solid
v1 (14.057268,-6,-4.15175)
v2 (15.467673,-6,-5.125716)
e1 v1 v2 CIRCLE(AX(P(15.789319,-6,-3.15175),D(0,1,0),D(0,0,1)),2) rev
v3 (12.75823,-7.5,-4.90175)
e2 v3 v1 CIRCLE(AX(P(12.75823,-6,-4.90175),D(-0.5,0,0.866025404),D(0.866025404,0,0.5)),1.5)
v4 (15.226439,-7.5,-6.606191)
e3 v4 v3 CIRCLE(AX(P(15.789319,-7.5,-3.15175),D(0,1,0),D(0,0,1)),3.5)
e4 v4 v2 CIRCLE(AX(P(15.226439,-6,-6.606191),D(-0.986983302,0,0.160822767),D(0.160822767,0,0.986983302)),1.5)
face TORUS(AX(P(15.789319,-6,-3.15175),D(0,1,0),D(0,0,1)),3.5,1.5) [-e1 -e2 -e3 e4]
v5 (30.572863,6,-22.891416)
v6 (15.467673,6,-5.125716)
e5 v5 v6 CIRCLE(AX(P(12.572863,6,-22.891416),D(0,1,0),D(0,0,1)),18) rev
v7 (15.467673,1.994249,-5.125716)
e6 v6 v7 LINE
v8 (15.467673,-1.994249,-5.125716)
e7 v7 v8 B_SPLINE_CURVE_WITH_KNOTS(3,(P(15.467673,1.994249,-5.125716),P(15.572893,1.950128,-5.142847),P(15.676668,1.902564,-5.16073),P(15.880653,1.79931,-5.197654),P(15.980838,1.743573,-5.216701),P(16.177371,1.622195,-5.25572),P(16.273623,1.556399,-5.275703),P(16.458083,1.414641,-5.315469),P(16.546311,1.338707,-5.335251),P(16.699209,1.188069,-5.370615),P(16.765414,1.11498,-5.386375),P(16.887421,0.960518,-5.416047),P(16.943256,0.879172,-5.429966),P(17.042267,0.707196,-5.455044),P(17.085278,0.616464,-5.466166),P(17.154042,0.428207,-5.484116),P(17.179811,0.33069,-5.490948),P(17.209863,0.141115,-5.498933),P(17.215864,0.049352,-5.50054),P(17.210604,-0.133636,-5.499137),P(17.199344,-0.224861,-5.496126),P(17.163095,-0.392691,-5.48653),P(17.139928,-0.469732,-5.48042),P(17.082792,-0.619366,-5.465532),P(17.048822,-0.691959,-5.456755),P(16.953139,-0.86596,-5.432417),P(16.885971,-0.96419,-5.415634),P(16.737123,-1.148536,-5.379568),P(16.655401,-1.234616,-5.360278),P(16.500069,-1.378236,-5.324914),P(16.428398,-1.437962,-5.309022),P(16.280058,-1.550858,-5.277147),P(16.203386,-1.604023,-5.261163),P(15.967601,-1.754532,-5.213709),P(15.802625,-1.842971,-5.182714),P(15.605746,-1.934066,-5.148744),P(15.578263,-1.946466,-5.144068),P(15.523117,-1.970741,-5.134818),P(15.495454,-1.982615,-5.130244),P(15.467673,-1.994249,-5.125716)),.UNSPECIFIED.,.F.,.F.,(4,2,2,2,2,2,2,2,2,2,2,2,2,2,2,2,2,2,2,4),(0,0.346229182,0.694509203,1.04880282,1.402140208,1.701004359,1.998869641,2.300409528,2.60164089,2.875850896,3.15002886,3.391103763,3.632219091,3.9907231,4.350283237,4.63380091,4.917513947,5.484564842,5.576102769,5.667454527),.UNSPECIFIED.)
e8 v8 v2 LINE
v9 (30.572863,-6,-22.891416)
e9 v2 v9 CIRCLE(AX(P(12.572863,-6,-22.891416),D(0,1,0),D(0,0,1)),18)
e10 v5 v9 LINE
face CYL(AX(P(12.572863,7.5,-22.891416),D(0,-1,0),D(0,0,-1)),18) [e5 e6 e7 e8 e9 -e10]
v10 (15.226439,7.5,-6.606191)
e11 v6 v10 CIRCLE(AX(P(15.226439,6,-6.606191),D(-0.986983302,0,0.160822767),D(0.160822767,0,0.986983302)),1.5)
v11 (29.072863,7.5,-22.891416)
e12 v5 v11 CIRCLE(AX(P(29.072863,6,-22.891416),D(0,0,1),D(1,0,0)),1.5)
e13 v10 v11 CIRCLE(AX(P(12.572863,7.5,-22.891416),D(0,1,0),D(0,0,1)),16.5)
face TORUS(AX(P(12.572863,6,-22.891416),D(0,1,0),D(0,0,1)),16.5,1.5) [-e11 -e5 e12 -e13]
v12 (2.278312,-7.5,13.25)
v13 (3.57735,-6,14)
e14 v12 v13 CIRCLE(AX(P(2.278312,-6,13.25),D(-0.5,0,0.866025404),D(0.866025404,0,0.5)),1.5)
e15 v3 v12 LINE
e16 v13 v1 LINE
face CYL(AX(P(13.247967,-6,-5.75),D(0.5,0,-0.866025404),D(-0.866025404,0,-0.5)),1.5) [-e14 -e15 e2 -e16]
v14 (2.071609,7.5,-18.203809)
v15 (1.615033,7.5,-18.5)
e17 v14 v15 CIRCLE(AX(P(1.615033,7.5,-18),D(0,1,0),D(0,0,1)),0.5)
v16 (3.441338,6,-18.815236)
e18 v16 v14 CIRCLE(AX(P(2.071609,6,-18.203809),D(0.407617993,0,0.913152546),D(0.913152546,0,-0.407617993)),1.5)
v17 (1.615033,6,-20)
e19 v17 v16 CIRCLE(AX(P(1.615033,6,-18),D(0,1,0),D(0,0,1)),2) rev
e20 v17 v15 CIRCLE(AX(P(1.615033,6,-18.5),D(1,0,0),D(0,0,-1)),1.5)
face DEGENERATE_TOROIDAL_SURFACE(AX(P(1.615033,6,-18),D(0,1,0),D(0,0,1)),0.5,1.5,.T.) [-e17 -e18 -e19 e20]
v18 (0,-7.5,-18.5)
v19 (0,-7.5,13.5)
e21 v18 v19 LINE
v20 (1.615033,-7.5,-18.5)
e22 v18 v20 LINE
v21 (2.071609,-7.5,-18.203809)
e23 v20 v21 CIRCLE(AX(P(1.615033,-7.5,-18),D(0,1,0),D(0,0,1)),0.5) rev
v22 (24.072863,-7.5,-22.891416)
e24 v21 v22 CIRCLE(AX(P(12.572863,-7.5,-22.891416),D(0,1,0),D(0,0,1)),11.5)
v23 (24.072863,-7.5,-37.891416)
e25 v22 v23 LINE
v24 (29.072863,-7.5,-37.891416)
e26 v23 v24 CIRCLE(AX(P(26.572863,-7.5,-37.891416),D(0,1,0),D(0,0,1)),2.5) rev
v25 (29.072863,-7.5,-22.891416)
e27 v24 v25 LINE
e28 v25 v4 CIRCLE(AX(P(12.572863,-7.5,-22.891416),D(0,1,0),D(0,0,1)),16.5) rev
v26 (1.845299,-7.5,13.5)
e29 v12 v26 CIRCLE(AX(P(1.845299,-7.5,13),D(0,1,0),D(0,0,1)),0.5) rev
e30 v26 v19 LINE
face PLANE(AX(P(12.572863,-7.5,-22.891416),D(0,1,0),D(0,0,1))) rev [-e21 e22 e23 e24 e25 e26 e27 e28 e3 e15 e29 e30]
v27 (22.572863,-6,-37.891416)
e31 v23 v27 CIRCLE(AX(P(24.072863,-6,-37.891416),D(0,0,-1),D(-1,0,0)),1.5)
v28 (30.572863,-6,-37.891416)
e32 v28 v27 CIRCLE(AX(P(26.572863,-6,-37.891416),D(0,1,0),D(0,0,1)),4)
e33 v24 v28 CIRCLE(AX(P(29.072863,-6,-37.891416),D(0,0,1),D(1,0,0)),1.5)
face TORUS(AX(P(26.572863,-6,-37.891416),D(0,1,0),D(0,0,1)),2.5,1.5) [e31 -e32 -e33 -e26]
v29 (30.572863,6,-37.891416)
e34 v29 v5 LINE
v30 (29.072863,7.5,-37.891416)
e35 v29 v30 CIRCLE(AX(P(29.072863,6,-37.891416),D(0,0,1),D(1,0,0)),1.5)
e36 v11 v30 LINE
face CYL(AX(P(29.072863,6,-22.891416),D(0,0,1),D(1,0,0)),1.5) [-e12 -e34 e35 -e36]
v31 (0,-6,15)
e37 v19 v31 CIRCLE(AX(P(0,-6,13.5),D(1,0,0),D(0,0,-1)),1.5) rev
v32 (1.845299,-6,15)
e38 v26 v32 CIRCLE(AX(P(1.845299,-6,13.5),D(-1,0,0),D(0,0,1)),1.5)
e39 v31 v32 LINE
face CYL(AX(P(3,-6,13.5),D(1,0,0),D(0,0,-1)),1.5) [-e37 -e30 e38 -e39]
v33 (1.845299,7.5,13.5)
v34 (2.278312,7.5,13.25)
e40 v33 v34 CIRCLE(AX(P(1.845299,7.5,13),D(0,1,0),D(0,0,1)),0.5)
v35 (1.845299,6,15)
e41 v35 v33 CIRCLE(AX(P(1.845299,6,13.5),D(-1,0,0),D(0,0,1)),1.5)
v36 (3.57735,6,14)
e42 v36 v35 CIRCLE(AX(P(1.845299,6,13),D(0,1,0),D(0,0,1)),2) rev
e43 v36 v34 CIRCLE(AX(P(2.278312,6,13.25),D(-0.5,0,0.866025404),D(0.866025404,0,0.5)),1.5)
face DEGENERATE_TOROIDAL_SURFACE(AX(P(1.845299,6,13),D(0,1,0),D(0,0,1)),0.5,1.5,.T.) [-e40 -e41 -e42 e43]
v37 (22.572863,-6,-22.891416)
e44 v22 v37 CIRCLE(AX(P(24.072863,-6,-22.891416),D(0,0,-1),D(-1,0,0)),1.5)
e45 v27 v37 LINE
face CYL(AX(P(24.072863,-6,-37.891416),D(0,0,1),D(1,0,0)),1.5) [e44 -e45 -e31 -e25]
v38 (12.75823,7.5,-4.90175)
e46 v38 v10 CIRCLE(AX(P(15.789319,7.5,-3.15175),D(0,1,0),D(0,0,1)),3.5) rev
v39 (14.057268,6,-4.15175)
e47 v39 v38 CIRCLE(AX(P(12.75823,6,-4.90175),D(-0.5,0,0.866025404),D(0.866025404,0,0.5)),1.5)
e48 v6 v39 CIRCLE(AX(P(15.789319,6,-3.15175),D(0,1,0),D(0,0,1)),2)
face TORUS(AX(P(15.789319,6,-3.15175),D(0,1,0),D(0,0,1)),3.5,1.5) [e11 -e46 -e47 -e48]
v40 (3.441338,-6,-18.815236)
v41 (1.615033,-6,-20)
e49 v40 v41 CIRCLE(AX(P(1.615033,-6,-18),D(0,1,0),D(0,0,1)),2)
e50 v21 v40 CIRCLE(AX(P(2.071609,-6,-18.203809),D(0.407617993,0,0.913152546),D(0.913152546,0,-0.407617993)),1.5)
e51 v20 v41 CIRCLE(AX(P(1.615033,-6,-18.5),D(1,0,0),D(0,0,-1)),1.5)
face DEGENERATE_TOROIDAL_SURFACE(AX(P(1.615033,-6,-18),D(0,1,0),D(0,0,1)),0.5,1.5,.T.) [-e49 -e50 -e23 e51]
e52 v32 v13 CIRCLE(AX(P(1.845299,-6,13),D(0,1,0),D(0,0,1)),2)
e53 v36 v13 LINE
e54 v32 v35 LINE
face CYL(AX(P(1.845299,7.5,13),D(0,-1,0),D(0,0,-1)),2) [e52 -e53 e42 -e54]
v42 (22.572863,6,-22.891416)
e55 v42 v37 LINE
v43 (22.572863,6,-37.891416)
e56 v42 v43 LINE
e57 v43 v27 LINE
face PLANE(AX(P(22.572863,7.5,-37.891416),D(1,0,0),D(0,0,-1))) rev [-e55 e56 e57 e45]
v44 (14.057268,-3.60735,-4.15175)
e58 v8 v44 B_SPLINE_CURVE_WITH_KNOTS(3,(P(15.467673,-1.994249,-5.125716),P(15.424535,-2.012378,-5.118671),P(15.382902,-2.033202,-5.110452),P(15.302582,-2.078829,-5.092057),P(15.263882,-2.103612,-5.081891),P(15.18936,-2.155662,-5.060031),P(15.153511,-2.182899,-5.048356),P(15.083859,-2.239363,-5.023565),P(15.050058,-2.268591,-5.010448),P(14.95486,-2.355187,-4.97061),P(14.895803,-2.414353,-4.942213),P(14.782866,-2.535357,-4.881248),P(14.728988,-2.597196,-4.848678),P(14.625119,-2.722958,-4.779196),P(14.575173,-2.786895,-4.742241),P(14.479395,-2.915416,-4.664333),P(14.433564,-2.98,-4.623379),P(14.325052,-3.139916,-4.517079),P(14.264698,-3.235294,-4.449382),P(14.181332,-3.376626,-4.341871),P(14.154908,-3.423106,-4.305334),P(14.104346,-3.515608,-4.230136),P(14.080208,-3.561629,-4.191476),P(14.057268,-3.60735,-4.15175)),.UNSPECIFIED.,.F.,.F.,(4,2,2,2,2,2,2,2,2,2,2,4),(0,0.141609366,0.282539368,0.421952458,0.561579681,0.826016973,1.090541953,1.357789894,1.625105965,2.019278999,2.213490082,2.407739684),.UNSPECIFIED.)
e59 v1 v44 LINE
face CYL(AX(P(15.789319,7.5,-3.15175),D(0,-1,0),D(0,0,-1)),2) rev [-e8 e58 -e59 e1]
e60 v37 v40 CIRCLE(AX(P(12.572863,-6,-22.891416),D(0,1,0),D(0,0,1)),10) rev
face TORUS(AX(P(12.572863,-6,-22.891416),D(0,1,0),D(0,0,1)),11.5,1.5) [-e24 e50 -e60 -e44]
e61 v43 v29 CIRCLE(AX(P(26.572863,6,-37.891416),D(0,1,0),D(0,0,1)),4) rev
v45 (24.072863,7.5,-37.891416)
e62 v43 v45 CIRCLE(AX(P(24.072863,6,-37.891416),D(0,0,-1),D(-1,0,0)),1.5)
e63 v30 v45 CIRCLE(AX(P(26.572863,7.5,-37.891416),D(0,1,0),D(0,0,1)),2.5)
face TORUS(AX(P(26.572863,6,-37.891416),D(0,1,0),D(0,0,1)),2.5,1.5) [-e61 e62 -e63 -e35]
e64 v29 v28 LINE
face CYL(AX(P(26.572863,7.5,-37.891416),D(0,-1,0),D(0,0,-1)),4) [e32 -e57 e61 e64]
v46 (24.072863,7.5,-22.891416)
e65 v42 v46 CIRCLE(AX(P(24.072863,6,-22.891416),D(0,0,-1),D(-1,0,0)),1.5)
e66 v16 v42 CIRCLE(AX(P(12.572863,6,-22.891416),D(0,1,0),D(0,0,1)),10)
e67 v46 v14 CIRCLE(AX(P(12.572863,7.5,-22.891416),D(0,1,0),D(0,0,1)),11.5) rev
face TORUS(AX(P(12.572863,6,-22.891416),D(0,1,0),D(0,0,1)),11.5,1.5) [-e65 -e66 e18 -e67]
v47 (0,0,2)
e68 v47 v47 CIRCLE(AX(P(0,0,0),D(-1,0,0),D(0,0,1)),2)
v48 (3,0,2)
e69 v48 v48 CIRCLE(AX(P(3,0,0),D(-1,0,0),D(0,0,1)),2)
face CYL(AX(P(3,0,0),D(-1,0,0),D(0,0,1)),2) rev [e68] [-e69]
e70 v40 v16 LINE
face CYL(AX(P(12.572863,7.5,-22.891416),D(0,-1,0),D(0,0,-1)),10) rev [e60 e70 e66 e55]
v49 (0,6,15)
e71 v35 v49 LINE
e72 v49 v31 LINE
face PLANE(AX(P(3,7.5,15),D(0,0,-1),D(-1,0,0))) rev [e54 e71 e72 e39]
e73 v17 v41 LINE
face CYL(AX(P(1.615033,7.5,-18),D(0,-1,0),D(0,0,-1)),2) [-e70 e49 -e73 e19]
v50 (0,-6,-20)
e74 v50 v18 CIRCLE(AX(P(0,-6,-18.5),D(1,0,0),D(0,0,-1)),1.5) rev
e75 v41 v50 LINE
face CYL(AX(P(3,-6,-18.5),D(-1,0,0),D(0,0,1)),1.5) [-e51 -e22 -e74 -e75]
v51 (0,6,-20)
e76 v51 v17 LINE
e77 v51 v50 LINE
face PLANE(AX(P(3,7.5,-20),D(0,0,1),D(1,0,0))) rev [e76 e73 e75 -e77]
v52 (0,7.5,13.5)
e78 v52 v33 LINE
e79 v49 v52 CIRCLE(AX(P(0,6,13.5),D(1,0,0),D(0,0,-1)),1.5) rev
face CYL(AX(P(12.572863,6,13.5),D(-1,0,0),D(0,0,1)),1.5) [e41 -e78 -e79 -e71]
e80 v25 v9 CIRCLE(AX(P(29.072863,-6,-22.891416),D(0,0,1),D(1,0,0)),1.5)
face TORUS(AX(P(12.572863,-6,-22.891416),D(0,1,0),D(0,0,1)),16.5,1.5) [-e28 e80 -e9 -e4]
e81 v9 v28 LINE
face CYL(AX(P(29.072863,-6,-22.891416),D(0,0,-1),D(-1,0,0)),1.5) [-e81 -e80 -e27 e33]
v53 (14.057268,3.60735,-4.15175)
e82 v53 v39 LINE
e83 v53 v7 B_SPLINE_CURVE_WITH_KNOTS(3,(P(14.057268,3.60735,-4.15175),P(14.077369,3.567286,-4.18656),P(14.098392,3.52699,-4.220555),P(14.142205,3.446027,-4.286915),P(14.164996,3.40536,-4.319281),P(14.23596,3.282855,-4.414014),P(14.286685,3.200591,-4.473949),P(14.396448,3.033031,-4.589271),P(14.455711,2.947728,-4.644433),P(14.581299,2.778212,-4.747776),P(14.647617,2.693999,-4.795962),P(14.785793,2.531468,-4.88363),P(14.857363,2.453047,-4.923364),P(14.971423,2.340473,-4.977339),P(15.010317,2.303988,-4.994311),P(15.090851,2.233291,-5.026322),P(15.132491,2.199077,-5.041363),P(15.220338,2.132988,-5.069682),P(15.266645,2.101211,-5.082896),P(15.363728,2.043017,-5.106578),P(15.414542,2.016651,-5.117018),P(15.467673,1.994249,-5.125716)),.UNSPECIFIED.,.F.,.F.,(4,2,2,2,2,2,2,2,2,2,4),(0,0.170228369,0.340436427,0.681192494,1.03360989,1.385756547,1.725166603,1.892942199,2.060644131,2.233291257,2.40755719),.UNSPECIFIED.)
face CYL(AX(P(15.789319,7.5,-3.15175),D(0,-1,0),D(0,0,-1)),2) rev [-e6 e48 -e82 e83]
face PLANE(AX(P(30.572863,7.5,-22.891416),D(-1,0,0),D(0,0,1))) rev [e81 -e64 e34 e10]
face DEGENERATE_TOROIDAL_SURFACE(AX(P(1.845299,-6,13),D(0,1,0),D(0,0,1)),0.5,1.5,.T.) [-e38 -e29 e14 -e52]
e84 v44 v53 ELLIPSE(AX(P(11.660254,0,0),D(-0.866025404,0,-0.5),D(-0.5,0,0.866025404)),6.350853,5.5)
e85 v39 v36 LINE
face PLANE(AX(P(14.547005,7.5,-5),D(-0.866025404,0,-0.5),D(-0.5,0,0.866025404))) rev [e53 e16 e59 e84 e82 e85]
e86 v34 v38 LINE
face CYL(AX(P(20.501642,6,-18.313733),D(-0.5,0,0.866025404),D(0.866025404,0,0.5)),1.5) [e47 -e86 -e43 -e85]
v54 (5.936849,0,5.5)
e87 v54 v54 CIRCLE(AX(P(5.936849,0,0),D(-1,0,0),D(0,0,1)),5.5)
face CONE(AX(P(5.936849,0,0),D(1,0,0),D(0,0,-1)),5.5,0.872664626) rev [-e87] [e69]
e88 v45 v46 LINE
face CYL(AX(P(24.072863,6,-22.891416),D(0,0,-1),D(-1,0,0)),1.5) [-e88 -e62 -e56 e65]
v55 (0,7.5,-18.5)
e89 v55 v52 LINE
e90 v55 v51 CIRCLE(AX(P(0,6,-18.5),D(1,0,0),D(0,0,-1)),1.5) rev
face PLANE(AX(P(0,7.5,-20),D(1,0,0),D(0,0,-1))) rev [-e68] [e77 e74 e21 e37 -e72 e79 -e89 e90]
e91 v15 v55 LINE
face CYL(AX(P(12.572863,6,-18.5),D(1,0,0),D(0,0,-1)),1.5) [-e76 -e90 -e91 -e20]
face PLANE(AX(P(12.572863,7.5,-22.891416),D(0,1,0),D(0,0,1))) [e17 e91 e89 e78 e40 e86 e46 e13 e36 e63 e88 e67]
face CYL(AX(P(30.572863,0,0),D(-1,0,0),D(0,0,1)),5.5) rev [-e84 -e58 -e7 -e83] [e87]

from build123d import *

# Parameters (mm, degrees)
BOSS_EXTRU_1_DEPTH      = 7.5
CONG_1_R                = 2
ESQUISSE2_R             = 2
ENL_V_MAT_EXTRU_1_DEPTH = 3
ESQUISSE3_R             = 5.5
ENL_V_MAT_EXTRU_2_DEPTH = 51.709008317
CHANFREIN1_SIZE2        = 3.5
CHANFREIN1_SIZE         = 2.936848709
CONG_2_R                = 1.5


with BuildPart() as part:
    # Esquisse1 → Boss.-Extru.1 (new, symmetric)
    with BuildSketch(Plane(origin=(0, 0, 0), x_dir=(1, 0, 0), z_dir=(0, 1, 0))):
        with BuildLine():
            Line((3, -15), (0, -15))
            Line((0, -15), (0, 20))
            Line((0, 20), (3, 20))
            ThreePointArc((3, 20), (14.034261007, 12.998776376), (22.572863417, 22.891415916))
            Line((22.572863417, 22.891415916), (22.572863417, 37.891415916))
            ThreePointArc((22.572863417, 37.891415916), (26.572863417, 41.891415916), (30.572863417, 37.891415916))
            Line((30.572863417, 37.891415916), (30.572863417, 22.891415916))
            ThreePointArc((30.572863417, 22.891415916), (25.980595429, 10.881723069), (14.547005384, 5))
            Line((14.547005384, 5), (3, -15))
        make_face()
    extrude(amount=BOSS_EXTRU_1_DEPTH, both=True)

    # Congé1
    cong_1_edges = [part.edges().sort_by_distance(p)[0] for p in [
        (3, 0, -20),
        (14.547005384, 0, -5),
        (3, 0, 15),
    ]]
    fillet(cong_1_edges, radius=CONG_1_R)

    # Esquisse2 → Enlèv. mat.-Extru.1 (cut)
    with BuildSketch(Plane.ZY):
        Circle(ESQUISSE2_R)
    extrude(amount=-ENL_V_MAT_EXTRU_1_DEPTH, mode=Mode.SUBTRACT)

    # Esquisse3 → Enlèv. mat.-Extru.2 (cut, through all)
    with BuildSketch(Plane.ZY.offset(-3)):
        Circle(ESQUISSE3_R)
    extrude(amount=-ENL_V_MAT_EXTRU_2_DEPTH, mode=Mode.SUBTRACT)

    # Chanfrein1
    chanfrein1_edges = [part.edges().sort_by_distance(p)[0] for p in [
        (3, 0, -5.5),
    ]]
    chanfrein1_side = [part.faces().sort_by_distance(p)[0] for p in [
        (3.058736974, 0, -5.5),
    ]]
    chamfer(chanfrein1_edges, length=CHANFREIN1_SIZE - 0.0001, length2=CHANFREIN1_SIZE2 - 0.0001, reference=chanfrein1_side[0])  # a hair under: the kernel refuses the full size

    # Congé2
    cong_2_edges = [part.edges().sort_by_distance(p)[0] for p in [
        (30.572863417, -7.5, -30.391415916),
        (0.922649731, -7.5, 15),
        (30.572863417, 7.5, -30.391415916),
        (26.572863417, 7.5, -41.891415916),
        (22.572863417, 7.5, -30.391415916),
        (14.656699474, 7.5, -13.110944185),
        (0.807516434, -7.5, -20),
        (0.807516434, 7.5, -20),
        (26.286115703, -7.5, -11.231797066),
        (8.81730911, -7.5, 4.924125057),
        (2.845299462, -7.5, 14.732050808),
        (2.703501524, -7.5, -19.677866498),
        (8.81730911, 7.5, 4.924125057),
        (26.286115703, 7.5, -11.231797066),
        (2.845299462, 7.5, 14.732050808),
        (2.703501524, 7.5, -19.677866498),
        (14.652846189, -7.5, -4.797480755),
        (14.652846189, 7.5, -4.797480755),
        (0.922649731, 7.5, 15),
        (14.656699474, -7.5, -13.110944185),
        (22.572863417, -7.5, -30.391415916),
        (26.572863417, -7.5, -41.891415916),
    ]]
    fillet(cong_2_edges, radius=CONG_2_R)


solid = part.part
